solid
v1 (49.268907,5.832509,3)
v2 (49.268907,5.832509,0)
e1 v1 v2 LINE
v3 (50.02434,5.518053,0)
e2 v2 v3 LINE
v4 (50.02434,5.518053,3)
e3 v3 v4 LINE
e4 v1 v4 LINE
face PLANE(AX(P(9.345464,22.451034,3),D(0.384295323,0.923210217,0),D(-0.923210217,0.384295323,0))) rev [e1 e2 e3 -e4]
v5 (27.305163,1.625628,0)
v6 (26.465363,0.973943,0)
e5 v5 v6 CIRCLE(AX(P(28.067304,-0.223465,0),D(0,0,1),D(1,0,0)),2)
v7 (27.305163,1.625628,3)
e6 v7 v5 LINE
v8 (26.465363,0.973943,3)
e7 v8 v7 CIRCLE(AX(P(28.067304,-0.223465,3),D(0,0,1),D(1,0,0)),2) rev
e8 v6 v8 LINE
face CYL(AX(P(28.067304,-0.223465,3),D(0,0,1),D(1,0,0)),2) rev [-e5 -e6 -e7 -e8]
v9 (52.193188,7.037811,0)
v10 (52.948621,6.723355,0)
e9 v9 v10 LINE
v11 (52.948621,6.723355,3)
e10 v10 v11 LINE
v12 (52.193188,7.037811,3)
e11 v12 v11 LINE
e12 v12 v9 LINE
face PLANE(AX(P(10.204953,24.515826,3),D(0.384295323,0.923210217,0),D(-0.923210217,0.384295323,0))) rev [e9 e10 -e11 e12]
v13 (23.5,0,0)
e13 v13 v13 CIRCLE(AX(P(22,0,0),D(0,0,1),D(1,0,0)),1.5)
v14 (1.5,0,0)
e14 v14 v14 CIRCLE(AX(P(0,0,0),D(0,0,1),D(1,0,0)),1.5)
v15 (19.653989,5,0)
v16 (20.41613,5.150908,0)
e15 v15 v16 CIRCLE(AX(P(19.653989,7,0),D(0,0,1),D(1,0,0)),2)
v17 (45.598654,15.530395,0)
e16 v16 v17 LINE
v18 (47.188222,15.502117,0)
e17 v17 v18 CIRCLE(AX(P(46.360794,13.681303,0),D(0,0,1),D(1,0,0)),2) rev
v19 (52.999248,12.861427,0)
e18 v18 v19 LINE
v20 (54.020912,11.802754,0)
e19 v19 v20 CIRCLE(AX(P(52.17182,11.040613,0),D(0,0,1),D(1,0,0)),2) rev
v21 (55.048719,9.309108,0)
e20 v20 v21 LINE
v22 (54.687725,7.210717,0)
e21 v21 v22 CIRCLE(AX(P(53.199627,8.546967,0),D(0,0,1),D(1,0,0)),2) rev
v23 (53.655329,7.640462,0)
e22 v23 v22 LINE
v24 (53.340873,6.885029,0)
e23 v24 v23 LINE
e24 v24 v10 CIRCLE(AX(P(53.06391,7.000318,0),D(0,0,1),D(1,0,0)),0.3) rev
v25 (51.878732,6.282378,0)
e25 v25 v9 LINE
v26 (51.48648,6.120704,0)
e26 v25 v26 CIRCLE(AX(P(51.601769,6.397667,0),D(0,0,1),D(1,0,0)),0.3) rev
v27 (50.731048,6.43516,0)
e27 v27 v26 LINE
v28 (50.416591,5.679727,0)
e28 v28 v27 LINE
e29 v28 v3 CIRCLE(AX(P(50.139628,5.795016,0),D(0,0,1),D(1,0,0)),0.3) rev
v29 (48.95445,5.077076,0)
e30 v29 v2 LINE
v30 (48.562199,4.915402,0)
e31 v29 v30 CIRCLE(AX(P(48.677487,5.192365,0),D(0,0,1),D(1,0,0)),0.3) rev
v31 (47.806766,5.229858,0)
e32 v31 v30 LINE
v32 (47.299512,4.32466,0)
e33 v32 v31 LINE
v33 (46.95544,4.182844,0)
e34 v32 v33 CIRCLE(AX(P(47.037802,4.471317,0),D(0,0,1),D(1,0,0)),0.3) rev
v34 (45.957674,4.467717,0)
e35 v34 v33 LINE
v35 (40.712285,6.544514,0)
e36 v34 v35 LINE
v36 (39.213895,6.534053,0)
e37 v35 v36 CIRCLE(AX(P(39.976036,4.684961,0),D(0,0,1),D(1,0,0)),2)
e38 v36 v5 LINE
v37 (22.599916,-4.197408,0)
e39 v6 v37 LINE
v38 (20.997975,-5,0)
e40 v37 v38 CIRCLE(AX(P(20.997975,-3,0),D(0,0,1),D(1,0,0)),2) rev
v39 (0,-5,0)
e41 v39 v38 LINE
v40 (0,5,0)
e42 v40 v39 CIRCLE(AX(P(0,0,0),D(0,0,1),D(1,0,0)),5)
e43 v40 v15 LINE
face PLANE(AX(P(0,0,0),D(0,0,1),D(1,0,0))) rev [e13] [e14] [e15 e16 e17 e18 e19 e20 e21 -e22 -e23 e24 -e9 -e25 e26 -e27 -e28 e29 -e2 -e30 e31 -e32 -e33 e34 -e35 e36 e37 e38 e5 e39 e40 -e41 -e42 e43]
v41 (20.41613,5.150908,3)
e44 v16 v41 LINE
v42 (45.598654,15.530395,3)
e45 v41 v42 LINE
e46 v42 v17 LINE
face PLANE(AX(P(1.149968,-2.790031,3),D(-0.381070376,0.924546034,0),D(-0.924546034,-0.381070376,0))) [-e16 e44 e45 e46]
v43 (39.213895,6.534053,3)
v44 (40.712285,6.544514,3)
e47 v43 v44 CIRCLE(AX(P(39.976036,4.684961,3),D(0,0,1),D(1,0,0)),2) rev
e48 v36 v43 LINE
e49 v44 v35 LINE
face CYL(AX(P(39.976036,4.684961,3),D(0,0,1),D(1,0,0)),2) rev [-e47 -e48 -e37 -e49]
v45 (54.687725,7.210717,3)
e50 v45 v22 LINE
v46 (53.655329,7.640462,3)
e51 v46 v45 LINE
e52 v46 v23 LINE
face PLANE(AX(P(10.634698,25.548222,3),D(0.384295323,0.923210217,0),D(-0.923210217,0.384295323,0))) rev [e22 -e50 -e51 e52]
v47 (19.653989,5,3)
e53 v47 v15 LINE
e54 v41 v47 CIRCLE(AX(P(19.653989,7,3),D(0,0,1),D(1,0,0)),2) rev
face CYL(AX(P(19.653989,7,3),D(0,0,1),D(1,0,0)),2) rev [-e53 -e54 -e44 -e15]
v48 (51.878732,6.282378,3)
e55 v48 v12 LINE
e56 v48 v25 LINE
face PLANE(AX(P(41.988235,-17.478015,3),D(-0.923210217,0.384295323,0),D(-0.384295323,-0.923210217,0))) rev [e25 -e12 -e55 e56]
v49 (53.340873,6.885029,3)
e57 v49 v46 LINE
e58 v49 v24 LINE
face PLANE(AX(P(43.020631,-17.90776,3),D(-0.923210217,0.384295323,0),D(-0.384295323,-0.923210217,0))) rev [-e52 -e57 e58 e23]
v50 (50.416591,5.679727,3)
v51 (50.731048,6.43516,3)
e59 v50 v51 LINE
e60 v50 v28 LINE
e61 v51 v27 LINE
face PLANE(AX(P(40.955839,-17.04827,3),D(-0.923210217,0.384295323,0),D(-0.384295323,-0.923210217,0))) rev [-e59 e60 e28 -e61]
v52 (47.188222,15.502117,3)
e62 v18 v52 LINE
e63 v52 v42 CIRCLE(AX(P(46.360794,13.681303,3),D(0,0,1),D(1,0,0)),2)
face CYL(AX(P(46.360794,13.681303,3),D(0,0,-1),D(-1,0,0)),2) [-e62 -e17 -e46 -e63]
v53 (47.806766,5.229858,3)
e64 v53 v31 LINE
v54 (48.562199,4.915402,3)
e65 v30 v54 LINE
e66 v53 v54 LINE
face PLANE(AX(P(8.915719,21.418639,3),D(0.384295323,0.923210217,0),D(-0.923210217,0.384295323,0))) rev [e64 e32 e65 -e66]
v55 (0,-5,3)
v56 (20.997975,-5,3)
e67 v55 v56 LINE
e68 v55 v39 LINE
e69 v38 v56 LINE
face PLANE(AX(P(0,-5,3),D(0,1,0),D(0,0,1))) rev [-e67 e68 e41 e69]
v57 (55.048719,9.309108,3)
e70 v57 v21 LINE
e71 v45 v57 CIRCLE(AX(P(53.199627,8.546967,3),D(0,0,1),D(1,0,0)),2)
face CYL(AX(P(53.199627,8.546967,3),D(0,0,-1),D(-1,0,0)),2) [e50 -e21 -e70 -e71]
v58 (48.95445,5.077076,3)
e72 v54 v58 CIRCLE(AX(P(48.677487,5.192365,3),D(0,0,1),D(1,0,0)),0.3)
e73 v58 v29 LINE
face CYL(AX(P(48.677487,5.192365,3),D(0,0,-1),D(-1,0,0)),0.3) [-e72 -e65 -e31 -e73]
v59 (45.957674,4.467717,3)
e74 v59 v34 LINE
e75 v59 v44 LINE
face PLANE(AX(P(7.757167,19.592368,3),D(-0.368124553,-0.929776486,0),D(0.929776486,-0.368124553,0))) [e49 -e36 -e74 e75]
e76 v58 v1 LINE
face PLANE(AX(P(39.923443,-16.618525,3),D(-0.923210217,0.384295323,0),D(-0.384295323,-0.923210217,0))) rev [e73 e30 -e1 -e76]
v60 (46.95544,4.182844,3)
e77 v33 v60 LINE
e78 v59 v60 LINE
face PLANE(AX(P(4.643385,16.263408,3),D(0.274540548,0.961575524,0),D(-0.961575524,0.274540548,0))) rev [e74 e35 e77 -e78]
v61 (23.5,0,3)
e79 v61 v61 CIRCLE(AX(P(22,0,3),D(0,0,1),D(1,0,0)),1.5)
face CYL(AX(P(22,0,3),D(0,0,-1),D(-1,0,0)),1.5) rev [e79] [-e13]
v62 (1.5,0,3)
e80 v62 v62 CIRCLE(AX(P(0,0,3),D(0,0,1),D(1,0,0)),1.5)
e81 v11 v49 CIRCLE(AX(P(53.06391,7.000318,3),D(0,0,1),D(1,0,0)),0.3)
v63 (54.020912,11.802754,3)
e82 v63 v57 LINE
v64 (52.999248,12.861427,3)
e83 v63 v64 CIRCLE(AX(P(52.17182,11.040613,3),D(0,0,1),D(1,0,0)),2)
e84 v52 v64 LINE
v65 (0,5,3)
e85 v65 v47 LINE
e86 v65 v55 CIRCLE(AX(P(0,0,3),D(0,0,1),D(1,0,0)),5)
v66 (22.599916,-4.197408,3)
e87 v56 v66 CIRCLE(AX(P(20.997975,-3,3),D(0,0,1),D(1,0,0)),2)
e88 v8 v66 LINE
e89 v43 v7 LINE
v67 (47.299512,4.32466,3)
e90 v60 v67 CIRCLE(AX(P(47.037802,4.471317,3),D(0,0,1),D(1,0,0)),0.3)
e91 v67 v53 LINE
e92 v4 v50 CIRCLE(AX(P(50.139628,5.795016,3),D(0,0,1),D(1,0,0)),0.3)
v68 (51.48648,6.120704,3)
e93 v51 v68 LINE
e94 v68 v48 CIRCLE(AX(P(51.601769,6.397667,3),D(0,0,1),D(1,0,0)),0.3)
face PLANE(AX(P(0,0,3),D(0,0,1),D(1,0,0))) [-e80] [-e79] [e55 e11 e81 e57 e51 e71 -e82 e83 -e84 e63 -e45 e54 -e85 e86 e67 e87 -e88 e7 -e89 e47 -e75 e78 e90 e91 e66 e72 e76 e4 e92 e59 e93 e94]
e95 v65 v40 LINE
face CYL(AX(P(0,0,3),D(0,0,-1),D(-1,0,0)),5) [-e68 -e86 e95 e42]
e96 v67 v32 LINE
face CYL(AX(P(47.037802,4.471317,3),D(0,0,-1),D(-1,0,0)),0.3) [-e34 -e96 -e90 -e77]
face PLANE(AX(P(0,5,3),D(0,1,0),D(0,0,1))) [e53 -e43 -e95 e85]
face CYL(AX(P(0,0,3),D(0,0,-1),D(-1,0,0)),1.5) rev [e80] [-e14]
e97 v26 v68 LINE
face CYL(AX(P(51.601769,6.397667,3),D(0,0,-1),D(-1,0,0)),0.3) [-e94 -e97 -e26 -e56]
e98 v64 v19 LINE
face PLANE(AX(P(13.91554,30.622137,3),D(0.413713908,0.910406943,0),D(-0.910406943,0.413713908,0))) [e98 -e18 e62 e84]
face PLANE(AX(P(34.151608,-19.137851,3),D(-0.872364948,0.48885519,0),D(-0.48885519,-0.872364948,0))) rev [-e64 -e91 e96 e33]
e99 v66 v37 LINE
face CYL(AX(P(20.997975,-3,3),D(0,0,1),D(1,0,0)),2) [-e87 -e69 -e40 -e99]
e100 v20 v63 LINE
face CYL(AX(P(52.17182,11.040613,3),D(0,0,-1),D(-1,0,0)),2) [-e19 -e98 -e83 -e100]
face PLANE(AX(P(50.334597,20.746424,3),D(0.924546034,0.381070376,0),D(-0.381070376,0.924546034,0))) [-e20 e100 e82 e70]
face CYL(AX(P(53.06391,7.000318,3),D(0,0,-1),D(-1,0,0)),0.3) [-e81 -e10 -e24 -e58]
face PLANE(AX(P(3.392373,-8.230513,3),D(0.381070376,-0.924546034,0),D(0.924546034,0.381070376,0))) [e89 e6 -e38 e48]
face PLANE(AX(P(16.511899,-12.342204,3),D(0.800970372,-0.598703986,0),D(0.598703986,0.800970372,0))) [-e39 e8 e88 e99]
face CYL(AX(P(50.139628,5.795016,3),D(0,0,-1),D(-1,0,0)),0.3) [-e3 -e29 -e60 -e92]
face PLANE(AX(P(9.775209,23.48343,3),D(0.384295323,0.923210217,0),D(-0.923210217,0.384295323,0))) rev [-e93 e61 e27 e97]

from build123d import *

# Parameters (mm, degrees)
SKETCH2_R           = 1.5
BOSS_EXTRUDE1_DEPTH = 3
FILLET1_START       = -1
FILLET1_DEPTH       = 5
FILLET1_2_DEPTH     = 3
FILLET2_R           = 0.3


with BuildPart() as part:
    # Sketch2 → Boss-Extrude1 (new body)
    with BuildSketch(Plane.XY):
        with BuildLine():
            Line((20.05, 5), (0, 5))
            ThreePointArc((0, 5), (-5, 0), (0, -5))
            Line((0, -5), (22, -5))
            Line((22, -5), (26.795441544, 1.415535375))
            Line((26.795441544, 1.415535375), (39.960977063, 6.841977535))
            Line((39.960977063, 6.841977535), (45.957673933, 4.467717283))
            Line((45.957673933, 4.467717283), (47.183545432, 4.117717283))
            Line((47.183545432, 4.117717283), (47.806766001, 5.229858036))
            Line((47.806766001, 5.229858036), (48.839161842, 4.800113125))
            Line((48.839161842, 4.800113125), (49.268906753, 5.832508966))
            Line((49.268906753, 5.832508966), (50.301302595, 5.402764054))
            Line((50.301302595, 5.402764054), (50.731047506, 6.435159896))
            Line((50.731047506, 6.435159896), (51.763443347, 6.005414984))
            Line((51.763443347, 6.005414984), (52.193188259, 7.037810826))
            Line((52.193188259, 7.037810826), (53.2255841, 6.608065914))
            Line((53.2255841, 6.608065914), (53.655329011, 7.640461756))
            Line((53.655329011, 7.640461756), (54.687724853, 7.210716844))
            Line((54.687724853, 7.210716844), (55.741112884, 7.640461756))
            Line((55.741112884, 7.640461756), (55.434270778, 8.373688641))
            Line((55.434270778, 8.373688641), (53.719454084, 12.534145792))
            Line((53.719454084, 12.534145792), (46.399561958, 15.860505726))
            Line((46.399561958, 15.860505726), (20.05, 5))
        make_face()
        Circle(SKETCH2_R, mode=Mode.SUBTRACT)
        with Locations((22, 0)):
            Circle(SKETCH2_R, mode=Mode.SUBTRACT)
    extrude(amount=BOSS_EXTRUDE1_DEPTH)

    # Fillet1: read off the stored shape, not the designer's step
    # Fillet1 outline → Fillet1 (cut)
    with BuildSketch(Plane.XY.offset(FILLET1_START)):
        with BuildLine():
            Line((55.434270778, 8.373688641), (55.048718881, 9.309107658))
            ThreePointArc((55.048718881, 9.309107658), (55.170672337, 8.207880564), (54.687724853, 7.210716844))
            Line((54.687724853, 7.210716844), (55.741112884, 7.640461756))
            Line((55.741112884, 7.640461756), (55.434270778, 8.373688641))
        make_face()
        with BuildLine():
            Line((53.719454084, 12.534145792), (52.999247687, 12.861427351))
            ThreePointArc((52.999247687, 12.861427351), (53.610964364, 12.429448634), (54.020911938, 11.802754217))
            Line((54.020911938, 11.802754217), (53.719454084, 12.534145792))
        make_face()
        with BuildLine():
            Line((46.399561958, 15.860505726), (45.598653524, 15.530395091))
            ThreePointArc((45.598653524, 15.530395091), (46.396368341, 15.68098662), (47.188222093, 15.50211691))
            Line((47.188222093, 15.50211691), (46.399561958, 15.860505726))
        make_face()
        with BuildLine():
            Line((22, -5), (22.59991613, -4.197407971))
            ThreePointArc((22.59991613, -4.197407971), (21.893850393, -4.788129741), (20.997975386, -5))
            Line((20.997975386, -5), (22, -5))
        make_face()
    extrude(amount=FILLET1_DEPTH, mode=Mode.SUBTRACT)

    # Fillet1 2 outline → Fillet1 2 (add)
    with BuildSketch(Plane.XY):
        with BuildLine():
            ThreePointArc((20.416130089, 5.150907933), (20.042458039, 5.038089689), (19.653989336, 5))
            Line((19.653989336, 5), (20.05, 5))
            Line((20.05, 5), (20.416130089, 5.150907933))
        make_face()
        with BuildLine():
            ThreePointArc((26.465363358, 0.973943448), (26.841174676, 1.356600864), (27.305163351, 1.625627544))
            Line((27.305163351, 1.625627544), (26.795441544, 1.415535375))
            Line((26.795441544, 1.415535375), (26.465363358, 0.973943448))
        make_face()
        with BuildLine():
            ThreePointArc((39.213895373, 6.534052683), (39.962073605, 6.684911877), (40.712285231, 6.544513587))
            Line((40.712285231, 6.544513587), (39.960977063, 6.841977535))
            Line((39.960977063, 6.841977535), (39.213895373, 6.534052683))
        make_face()
    extrude(amount=FILLET1_2_DEPTH)

    # Fillet2
    fillet2_edges = [part.edges().sort_by_distance(p)[0] for p in [
        (53.2255841, 6.608065914, 1.5),
        (51.763443347, 6.005414984, 1.5),
        (50.301302595, 5.402764054, 1.5),
        (48.839161842, 4.800113125, 1.5),
        (47.183545432, 4.117717283, 1.5),
    ]]
    fillet(fillet2_edges, radius=FILLET2_R)


solid = part.part
